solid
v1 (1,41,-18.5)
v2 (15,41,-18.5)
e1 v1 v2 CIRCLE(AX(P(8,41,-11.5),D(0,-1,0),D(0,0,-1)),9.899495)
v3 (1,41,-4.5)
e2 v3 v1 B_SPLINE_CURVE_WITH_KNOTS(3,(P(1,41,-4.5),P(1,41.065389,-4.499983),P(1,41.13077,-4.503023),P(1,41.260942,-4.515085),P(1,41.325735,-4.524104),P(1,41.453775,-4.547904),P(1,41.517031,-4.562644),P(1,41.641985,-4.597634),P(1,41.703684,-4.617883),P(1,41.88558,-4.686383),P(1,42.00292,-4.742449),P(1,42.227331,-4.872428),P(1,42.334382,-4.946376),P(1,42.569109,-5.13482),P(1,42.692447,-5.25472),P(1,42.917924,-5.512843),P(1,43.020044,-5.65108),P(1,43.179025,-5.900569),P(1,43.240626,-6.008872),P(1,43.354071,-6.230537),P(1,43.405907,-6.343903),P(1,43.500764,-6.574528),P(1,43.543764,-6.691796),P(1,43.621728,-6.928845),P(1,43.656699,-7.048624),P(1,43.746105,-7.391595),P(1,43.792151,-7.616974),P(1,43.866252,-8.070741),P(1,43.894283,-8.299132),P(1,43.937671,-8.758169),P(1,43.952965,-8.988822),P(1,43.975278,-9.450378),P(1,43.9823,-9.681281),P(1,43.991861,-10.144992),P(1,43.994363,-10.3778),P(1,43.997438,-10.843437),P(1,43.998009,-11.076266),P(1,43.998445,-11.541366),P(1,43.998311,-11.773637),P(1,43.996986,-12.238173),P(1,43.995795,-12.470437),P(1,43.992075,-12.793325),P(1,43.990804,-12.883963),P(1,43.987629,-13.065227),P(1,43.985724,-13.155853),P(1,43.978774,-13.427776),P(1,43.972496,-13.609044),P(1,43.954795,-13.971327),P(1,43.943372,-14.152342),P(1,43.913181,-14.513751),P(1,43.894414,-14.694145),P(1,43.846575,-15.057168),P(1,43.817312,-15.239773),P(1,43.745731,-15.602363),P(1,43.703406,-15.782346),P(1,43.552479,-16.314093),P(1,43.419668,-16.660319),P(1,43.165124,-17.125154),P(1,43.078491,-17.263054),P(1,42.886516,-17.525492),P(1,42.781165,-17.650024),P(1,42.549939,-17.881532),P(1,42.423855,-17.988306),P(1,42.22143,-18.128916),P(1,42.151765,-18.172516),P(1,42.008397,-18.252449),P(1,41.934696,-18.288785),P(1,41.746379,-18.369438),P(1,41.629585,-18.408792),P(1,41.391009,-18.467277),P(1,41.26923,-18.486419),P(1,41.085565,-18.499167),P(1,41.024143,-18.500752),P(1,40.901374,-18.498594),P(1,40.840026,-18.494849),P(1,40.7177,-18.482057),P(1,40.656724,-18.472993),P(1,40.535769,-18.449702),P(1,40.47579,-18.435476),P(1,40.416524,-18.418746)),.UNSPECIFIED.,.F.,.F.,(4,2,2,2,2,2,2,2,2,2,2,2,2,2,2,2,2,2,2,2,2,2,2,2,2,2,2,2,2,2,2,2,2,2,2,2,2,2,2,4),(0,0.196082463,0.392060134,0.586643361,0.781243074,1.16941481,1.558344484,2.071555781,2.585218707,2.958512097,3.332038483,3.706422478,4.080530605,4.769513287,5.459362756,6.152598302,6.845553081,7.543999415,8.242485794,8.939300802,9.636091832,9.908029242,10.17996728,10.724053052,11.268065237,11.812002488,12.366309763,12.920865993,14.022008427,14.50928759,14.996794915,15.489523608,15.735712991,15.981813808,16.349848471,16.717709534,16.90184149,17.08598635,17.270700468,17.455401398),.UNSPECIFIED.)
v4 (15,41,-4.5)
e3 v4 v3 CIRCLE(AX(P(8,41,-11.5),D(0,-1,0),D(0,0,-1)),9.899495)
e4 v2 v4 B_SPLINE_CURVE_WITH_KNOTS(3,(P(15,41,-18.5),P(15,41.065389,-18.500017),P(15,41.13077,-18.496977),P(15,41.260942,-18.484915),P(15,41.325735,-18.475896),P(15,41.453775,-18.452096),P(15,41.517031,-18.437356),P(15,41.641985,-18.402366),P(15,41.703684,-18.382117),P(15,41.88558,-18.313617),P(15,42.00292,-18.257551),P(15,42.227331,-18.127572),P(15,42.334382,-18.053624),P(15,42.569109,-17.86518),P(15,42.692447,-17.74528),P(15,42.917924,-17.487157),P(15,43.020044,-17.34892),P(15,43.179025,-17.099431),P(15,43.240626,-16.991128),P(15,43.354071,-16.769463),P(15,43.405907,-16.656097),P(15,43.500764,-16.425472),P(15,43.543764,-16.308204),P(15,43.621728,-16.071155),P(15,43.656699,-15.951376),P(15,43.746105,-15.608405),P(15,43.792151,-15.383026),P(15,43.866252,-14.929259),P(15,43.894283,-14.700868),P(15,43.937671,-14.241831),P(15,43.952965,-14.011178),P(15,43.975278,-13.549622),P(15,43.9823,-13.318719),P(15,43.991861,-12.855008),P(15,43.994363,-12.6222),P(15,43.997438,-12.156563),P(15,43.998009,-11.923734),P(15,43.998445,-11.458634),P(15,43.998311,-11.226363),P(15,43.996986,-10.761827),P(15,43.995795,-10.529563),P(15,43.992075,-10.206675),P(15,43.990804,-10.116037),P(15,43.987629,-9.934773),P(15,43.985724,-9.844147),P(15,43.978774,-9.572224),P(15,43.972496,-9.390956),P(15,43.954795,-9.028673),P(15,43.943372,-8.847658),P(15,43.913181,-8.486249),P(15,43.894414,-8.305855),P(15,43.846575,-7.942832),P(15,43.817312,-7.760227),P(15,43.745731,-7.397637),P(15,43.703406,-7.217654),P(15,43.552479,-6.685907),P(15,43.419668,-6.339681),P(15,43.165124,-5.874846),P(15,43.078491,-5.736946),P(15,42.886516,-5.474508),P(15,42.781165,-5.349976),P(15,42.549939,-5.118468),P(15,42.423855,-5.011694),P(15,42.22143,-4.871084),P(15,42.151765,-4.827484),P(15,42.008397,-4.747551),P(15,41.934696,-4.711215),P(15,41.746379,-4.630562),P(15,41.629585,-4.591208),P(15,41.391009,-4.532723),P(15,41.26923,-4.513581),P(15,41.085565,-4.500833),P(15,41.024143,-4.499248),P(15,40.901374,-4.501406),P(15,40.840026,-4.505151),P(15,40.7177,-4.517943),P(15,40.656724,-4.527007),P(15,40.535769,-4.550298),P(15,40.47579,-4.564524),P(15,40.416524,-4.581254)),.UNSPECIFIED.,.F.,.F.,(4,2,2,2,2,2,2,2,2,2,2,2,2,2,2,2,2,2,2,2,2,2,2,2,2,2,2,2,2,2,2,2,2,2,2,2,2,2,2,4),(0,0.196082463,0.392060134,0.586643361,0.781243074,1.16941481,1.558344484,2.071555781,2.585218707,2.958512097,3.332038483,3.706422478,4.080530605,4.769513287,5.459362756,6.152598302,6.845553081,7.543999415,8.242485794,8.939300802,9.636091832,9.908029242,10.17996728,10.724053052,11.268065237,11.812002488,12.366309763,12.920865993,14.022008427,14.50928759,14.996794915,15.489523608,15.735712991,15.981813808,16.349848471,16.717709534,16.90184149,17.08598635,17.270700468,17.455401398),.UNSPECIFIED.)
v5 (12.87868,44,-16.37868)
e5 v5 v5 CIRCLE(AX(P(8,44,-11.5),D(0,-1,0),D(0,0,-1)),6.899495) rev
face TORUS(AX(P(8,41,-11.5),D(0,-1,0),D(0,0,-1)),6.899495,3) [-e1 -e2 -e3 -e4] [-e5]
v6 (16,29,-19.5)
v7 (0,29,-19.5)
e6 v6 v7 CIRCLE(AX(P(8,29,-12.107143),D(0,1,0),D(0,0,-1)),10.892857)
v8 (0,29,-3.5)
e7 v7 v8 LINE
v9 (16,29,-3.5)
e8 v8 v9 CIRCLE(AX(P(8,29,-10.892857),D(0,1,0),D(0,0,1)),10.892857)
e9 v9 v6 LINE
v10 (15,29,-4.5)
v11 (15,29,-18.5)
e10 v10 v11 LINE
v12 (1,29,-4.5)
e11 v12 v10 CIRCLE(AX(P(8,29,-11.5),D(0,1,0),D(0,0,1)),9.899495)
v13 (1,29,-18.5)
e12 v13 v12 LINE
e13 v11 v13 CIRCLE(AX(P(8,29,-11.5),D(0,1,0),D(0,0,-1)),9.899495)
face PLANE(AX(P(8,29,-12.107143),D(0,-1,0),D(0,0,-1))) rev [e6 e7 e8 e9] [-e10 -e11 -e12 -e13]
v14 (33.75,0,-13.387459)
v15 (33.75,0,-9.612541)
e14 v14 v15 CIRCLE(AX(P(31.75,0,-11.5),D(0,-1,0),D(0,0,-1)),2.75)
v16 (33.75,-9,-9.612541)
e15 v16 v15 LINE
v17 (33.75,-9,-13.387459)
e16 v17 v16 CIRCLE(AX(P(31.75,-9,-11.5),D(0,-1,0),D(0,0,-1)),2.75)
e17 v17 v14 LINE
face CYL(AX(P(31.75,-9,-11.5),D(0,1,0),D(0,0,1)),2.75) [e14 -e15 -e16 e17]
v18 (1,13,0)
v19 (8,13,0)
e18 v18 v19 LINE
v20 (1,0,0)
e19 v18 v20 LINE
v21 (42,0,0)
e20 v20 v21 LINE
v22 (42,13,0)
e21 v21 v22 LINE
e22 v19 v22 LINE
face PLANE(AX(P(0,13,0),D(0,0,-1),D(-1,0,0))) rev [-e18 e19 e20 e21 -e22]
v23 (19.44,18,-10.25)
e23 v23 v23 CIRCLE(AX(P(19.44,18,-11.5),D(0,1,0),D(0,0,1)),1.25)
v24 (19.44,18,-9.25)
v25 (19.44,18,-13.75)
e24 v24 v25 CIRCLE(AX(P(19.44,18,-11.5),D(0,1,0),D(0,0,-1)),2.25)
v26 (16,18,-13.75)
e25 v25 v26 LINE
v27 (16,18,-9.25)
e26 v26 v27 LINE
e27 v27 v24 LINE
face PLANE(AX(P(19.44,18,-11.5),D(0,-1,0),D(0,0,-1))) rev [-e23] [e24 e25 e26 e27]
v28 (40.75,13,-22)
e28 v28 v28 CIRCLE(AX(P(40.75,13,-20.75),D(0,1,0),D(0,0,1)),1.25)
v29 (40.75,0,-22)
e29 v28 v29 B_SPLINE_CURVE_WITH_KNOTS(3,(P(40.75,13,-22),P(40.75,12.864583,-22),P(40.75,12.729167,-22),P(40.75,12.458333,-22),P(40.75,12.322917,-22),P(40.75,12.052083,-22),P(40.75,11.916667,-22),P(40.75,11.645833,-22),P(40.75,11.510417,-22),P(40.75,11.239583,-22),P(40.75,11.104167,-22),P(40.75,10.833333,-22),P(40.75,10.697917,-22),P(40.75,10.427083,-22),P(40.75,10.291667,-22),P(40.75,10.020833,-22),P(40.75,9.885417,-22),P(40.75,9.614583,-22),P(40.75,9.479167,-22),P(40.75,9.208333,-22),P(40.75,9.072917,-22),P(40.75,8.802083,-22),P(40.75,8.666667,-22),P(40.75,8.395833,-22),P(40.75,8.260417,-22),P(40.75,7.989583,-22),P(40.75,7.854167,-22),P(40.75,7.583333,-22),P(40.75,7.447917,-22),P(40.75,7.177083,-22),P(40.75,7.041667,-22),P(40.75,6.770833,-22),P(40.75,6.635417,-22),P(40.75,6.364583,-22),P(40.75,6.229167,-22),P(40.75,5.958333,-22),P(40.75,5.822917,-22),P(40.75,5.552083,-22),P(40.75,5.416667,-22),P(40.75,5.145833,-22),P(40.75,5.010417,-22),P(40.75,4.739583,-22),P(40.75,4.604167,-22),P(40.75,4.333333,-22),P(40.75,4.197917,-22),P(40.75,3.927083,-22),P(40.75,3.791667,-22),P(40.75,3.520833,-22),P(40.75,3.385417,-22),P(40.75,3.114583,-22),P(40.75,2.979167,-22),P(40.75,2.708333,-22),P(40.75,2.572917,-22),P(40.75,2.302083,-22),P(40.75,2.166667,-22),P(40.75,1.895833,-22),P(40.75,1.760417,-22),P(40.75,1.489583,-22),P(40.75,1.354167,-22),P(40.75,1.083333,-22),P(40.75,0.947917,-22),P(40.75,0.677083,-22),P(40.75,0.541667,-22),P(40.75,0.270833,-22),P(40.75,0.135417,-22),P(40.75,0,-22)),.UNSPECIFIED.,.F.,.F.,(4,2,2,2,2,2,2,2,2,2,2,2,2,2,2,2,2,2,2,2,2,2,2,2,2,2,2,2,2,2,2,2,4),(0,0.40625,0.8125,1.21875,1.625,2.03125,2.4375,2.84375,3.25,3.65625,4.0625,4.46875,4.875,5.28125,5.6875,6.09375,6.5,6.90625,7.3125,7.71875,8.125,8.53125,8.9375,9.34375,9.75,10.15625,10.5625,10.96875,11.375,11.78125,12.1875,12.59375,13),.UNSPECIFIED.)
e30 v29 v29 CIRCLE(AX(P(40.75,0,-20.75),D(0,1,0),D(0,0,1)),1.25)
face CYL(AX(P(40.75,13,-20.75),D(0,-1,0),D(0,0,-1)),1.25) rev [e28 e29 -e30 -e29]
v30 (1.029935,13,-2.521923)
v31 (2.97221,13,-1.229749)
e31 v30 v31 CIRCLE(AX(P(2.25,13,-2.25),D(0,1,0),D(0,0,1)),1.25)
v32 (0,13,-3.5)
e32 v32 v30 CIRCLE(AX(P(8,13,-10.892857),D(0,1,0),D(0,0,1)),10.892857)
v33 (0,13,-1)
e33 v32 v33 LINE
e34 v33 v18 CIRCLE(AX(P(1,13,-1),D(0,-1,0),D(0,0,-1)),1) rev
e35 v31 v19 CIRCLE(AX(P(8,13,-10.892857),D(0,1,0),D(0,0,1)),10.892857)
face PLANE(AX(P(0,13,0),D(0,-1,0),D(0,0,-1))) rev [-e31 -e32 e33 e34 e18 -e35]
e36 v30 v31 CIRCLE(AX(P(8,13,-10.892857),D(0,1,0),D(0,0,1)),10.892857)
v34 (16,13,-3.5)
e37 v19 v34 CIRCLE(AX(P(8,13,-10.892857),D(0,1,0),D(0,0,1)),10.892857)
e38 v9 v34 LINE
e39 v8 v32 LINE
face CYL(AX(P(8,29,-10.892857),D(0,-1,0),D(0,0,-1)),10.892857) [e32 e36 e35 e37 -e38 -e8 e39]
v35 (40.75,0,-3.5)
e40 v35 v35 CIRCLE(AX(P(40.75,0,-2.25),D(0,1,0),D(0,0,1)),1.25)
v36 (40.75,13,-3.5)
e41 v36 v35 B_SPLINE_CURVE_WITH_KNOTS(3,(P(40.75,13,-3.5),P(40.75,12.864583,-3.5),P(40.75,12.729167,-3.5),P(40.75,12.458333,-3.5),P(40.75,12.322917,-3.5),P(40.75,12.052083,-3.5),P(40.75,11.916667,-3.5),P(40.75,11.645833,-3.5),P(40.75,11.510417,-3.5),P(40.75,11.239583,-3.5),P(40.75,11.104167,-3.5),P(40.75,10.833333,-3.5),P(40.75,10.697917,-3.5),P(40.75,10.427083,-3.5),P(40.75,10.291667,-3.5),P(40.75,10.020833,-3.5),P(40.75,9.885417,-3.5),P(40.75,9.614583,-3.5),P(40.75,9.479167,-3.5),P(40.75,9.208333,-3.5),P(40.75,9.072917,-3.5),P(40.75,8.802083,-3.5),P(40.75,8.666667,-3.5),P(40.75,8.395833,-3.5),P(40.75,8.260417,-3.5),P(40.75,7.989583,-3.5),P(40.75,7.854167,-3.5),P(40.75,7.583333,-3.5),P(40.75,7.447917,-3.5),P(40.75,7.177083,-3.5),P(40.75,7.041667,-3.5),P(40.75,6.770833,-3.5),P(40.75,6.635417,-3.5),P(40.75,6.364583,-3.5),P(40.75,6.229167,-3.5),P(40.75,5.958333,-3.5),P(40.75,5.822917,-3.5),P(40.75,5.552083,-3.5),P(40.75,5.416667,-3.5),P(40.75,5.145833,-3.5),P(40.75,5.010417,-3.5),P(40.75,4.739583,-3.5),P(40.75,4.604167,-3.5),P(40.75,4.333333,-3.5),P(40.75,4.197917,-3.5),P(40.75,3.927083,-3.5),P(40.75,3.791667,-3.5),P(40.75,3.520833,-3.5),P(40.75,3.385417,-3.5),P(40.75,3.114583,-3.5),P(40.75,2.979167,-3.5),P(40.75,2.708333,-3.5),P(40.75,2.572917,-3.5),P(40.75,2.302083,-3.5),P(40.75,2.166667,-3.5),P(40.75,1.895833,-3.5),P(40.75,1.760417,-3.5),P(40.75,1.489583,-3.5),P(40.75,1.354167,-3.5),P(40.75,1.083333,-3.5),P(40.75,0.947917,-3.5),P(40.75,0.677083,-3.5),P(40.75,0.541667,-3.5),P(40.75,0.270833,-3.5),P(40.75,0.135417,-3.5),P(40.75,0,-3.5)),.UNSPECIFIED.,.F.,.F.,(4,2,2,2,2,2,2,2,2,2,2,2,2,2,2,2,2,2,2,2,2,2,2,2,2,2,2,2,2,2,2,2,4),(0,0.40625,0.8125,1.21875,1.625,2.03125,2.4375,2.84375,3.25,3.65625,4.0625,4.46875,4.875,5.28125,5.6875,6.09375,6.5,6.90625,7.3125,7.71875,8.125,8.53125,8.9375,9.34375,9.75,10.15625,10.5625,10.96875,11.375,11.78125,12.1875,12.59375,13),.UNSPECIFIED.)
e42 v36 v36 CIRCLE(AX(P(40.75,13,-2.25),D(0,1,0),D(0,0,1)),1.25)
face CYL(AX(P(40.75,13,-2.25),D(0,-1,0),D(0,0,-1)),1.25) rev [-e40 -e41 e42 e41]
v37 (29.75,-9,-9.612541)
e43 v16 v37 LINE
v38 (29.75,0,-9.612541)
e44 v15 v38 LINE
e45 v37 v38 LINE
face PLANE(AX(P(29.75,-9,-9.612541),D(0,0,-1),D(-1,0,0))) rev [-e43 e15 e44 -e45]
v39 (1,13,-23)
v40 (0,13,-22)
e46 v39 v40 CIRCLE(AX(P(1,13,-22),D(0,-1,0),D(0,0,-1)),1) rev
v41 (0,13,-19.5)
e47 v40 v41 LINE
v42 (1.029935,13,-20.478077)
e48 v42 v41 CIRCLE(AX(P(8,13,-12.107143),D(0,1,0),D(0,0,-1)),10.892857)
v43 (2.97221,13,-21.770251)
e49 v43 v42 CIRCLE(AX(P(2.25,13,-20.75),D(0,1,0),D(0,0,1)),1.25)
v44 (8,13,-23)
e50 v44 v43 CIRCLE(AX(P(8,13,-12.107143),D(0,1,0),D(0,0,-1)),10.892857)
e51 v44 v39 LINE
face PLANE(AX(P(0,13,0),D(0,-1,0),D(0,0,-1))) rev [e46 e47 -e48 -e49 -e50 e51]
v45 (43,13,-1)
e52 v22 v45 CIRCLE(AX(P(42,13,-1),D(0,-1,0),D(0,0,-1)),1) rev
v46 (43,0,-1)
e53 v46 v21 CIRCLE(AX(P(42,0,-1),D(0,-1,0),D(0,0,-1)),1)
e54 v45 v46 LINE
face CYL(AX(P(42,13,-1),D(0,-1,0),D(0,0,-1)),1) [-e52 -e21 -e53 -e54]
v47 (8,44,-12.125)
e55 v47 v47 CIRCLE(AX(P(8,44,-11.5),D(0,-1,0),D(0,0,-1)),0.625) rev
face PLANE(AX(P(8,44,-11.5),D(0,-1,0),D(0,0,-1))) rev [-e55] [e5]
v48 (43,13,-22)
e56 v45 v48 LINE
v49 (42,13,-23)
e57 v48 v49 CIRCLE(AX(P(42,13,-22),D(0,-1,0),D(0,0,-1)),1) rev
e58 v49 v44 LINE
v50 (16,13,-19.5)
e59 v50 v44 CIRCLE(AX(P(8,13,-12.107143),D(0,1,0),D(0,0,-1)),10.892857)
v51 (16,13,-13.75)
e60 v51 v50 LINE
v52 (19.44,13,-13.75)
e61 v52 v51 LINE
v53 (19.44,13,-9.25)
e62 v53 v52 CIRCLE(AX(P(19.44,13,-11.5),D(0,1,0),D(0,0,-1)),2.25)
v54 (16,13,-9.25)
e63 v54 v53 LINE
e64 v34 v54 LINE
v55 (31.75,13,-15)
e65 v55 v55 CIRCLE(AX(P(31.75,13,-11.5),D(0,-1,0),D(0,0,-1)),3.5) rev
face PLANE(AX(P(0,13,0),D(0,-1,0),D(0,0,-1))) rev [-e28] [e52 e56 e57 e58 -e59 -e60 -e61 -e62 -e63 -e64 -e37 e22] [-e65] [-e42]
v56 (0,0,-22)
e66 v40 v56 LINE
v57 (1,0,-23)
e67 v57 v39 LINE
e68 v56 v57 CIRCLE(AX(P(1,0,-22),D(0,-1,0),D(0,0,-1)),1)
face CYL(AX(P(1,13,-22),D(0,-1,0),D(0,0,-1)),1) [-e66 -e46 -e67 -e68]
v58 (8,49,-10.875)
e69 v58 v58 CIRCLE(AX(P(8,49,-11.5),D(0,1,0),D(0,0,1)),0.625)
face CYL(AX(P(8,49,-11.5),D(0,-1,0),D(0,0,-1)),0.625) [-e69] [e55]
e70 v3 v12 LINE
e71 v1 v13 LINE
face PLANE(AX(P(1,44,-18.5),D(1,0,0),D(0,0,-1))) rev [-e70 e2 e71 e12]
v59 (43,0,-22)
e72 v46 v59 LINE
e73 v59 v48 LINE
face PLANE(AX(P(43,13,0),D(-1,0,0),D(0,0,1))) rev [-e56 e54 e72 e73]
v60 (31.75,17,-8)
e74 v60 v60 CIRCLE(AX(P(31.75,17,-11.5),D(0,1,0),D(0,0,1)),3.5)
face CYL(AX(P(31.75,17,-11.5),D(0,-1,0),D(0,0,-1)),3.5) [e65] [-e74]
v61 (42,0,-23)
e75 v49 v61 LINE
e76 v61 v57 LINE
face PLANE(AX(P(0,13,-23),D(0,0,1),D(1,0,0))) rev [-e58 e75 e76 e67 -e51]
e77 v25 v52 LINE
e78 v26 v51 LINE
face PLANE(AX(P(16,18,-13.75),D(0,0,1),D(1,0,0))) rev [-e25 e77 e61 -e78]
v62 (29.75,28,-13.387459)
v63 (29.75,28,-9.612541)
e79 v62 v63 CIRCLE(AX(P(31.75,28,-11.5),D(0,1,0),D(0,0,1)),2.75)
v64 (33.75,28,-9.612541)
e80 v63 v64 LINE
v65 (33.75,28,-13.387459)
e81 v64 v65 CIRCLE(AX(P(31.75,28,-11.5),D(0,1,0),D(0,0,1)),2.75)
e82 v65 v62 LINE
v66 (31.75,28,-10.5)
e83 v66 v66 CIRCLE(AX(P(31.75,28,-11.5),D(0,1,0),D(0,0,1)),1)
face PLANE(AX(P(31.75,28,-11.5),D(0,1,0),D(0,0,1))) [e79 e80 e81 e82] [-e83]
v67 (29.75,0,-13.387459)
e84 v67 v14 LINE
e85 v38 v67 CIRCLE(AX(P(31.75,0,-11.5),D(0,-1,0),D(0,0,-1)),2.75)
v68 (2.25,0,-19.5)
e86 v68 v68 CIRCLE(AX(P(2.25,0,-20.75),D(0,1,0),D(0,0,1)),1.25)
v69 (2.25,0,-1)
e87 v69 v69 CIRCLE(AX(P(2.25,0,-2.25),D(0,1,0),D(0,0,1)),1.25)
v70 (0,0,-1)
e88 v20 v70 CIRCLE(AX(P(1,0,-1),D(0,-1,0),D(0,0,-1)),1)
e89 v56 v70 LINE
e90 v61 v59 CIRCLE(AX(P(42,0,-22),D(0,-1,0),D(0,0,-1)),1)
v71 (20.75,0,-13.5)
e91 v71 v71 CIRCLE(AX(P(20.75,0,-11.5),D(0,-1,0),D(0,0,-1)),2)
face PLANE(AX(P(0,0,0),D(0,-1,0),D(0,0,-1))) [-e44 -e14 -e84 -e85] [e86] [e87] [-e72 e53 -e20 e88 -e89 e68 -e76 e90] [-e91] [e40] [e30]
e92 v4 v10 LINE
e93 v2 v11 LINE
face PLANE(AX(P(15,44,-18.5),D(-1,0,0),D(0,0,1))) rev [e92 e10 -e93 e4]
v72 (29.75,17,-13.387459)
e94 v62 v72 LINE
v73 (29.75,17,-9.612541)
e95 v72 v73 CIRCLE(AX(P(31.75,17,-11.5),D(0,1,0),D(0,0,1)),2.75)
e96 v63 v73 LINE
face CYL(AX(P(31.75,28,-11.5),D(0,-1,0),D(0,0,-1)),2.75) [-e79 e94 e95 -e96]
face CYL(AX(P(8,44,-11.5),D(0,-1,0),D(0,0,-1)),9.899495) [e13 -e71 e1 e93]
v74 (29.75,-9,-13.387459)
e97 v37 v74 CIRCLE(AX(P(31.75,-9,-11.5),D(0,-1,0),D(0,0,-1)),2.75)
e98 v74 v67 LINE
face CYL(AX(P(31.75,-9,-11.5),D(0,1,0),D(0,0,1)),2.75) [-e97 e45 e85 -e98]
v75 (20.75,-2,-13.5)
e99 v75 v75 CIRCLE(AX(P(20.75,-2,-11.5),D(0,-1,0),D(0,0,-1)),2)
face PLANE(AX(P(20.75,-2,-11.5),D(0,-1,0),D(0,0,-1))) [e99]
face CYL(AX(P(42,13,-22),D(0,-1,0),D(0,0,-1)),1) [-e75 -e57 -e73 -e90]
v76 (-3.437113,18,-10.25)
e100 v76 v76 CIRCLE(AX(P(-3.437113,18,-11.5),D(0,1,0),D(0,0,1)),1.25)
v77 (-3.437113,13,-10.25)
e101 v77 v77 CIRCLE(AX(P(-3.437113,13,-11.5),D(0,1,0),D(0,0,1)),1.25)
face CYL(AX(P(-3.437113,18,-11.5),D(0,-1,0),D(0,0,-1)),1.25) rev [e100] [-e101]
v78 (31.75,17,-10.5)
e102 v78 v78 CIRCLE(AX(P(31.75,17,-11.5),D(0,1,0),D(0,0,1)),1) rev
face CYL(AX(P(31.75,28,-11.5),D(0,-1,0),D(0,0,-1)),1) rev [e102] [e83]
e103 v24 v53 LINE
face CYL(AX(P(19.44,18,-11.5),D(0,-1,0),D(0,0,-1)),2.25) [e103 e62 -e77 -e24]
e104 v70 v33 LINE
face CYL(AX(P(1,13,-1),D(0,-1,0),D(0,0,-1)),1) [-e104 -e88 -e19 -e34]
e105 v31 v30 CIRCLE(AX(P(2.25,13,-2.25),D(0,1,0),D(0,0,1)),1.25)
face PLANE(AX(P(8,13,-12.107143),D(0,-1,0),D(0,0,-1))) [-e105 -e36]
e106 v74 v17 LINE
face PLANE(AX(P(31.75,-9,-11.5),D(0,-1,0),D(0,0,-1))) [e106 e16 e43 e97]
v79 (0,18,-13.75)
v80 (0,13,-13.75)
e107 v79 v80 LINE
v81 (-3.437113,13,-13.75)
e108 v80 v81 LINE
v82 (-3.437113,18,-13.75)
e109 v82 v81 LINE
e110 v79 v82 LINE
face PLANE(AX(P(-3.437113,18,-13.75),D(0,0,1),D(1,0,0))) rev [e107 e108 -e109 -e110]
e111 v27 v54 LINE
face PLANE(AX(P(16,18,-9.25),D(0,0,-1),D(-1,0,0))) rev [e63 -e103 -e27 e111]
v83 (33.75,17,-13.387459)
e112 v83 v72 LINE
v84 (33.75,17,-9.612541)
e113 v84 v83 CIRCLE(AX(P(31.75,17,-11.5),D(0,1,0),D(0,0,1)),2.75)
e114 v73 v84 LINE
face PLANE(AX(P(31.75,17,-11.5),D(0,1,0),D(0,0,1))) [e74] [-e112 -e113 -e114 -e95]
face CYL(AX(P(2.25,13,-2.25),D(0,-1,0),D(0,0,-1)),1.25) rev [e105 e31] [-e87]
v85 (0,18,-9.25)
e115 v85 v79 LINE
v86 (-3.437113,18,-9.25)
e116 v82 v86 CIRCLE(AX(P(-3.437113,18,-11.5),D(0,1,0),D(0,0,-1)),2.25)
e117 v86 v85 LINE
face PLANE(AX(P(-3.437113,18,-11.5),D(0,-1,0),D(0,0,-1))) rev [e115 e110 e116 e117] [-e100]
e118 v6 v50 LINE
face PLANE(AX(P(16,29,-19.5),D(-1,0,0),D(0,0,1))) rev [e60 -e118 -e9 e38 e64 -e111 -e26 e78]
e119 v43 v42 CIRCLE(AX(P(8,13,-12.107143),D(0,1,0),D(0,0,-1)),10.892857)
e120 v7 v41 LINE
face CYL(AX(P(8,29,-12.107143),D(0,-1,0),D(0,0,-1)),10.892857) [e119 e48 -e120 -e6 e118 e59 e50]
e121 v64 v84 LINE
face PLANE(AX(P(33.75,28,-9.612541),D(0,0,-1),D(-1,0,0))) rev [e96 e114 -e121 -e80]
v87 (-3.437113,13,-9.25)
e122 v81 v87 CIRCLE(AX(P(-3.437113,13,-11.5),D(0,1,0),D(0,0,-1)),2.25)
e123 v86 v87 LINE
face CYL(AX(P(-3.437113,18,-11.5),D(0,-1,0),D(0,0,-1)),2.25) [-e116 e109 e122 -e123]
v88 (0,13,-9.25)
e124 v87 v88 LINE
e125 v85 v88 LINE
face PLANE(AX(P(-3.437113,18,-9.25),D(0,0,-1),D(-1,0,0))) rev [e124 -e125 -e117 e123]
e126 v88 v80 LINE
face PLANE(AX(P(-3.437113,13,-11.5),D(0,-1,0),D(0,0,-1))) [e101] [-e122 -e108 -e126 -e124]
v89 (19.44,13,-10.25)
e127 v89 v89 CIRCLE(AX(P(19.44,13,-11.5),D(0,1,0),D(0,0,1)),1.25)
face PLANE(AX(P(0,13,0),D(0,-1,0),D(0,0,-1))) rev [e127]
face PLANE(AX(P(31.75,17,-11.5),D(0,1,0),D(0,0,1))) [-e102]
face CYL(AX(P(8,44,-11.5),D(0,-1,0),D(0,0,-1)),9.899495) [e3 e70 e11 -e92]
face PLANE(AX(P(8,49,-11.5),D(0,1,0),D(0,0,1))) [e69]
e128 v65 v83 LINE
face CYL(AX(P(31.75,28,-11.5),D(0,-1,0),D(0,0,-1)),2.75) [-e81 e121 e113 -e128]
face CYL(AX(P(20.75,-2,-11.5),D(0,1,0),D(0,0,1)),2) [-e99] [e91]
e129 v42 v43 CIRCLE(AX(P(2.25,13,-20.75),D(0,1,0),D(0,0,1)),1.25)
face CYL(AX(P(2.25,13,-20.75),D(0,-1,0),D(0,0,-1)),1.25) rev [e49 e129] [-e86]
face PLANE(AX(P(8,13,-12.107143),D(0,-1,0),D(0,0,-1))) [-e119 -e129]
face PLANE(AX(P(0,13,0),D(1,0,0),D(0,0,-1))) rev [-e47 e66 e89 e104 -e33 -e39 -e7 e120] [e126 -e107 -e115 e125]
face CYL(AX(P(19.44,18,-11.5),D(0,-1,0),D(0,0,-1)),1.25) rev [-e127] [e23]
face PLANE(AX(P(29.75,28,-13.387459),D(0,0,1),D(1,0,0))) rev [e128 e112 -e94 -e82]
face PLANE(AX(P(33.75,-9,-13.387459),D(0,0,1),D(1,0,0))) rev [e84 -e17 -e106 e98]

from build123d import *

# Parameters (mm, degrees)
SKETCH2_W            = 43
SKETCH2_H            = 23
SKETCH2_R            = 1.25
BOSS_EXTRUDE1_DEPTH  = 13
FILLET1_R            = 1
BOSS_EXTRUDE2_DEPTH  = 16
BOSS_EXTRUDE3_DEPTH  = 15
SKETCH5_R            = 0.625
BOSS_EXTRUDE4_DEPTH  = 5
FILLET2_R            = 3
SKETCH6_R            = 3.5
BOSS_EXTRUDE5_DEPTH  = 4
SKETCH7_R            = 1
BOSS_EXTRUDE7_DEPTH  = 11
SKETCH8_R            = 1.25
BOSS_EXTRUDE8_DEPTH  = 5
BOSS_EXTRUDE9_START  = 9
BOSS_EXTRUDE9_DEPTH  = 9
SKETCH10_R           = 2
BOSS_EXTRUDE10_DEPTH = 2


with BuildPart() as part:
    # Sketch2 → Boss-Extrude1 (new body)
    with BuildSketch(Plane(origin=(0, 0, 0), x_dir=(1, 0, 0), z_dir=(0, 1, 0))):
        with Locations((21.5, 11.5)):
            Rectangle(SKETCH2_W, SKETCH2_H)
        with Locations(Location((2.25, 20.75, 0), (0, 0, 90))):
            Circle(SKETCH2_R, mode=Mode.SUBTRACT)
        with Locations(Location((40.75, 20.75, 0), (0, 0, 90))):
            Circle(SKETCH2_R, mode=Mode.SUBTRACT)
        with Locations(Location((40.75, 2.25, 0), (0, 0, 90))):
            Circle(SKETCH2_R, mode=Mode.SUBTRACT)
        with Locations(Location((2.25, 2.25, 0), (0, 0, 90))):
            Circle(SKETCH2_R, mode=Mode.SUBTRACT)
    extrude(amount=BOSS_EXTRUDE1_DEPTH)

    # Fillet1
    fillet1_edges = [part.edges().sort_by_distance(p)[0] for p in [
        (0, 6.5, -23),
        (43, 6.5, -23),
        (43, 6.5, 0),
        (0, 6.5, 0),
    ]]
    fillet(fillet1_edges, radius=FILLET1_R)

    # Sketch3 → Boss-Extrude2 (add)
    with BuildSketch(Plane(origin=(0, 13, 0), x_dir=(1, 0, 0), z_dir=(0, 1, 0))):
        with BuildLine():
            Line((16, 19.5), (16, 3.5))
            ThreePointArc((16, 3.5), (8, 0), (0, 3.5))
            Line((0, 3.5), (0, 19.5))
            ThreePointArc((0, 19.5), (8, 23), (16, 19.5))
        make_face()
    extrude(amount=BOSS_EXTRUDE2_DEPTH)

    # Sketch4 → Boss-Extrude3 (add)
    with BuildSketch(Plane(origin=(0, 29, 0), x_dir=(1, 0, 0), z_dir=(0, 1, 0))):
        with BuildLine():
            Line((1, 18.5), (1, 4.5))
            ThreePointArc((1, 4.5), (8, 1.600505063), (15, 4.5))
            Line((15, 4.5), (15, 18.5))
            ThreePointArc((15, 18.5), (8, 21.399494937), (1, 18.5))
        make_face()
    extrude(amount=BOSS_EXTRUDE3_DEPTH)

    # Sketch5 → Boss-Extrude4 (add)
    with BuildSketch(Plane(origin=(0, 44, 0), x_dir=(1, 0, 0), z_dir=(0, 1, 0))):
        with Locations(Location((8, 11.5, 0), (0, 0, 90))):
            Circle(SKETCH5_R)
    extrude(amount=BOSS_EXTRUDE4_DEPTH)

    # Fillet2
    # the kernel refuses this fillet: 3 mm, written as the material it takes off along each edge
    with BuildSketch(Plane(origin=(8, 44, -11.5), x_dir=(0.5117233691003439, 0, 0.8591502741177431), z_dir=(-0.8591502741177431, 0, 0.5117233691003439))) as fillet2_piece_1:
        with BuildLine():
            CenterArc((9.899494937 - FILLET2_R, -FILLET2_R), FILLET2_R, 0, 90)
            Line((9.899494937 - FILLET2_R, 0), (9.899494937 - FILLET2_R, FILLET2_R * 0.02))
            Line((9.899494937 - FILLET2_R, FILLET2_R * 0.02), (9.899494937 + FILLET2_R * 0.02, FILLET2_R * 0.02))
            Line((9.899494937 + FILLET2_R * 0.02, FILLET2_R * 0.02), (9.899494937 + FILLET2_R * 0.02, -FILLET2_R))
            Line((9.899494937 + FILLET2_R * 0.02, -FILLET2_R), (9.899494937, -FILLET2_R))
        make_face()
    revolve(axis=Axis((8, 44, -11.5), (0, 1, 0)), revolution_arc=298.442618359, mode=Mode.SUBTRACT)
    with BuildSketch(Plane(origin=(8, 44, -11.5), x_dir=(-0.5117233691003458, 0, -0.859150274117742), z_dir=(0.859150274117742, 0, -0.5117233691003458))) as fillet2_piece_2:
        with BuildLine():
            CenterArc((9.899494937 - FILLET2_R, -FILLET2_R), FILLET2_R, 0, 90)
            Line((9.899494937 - FILLET2_R, 0), (9.899494937 - FILLET2_R, FILLET2_R * 0.02))
            Line((9.899494937 - FILLET2_R, FILLET2_R * 0.02), (9.899494937 + FILLET2_R * 0.02, FILLET2_R * 0.02))
            Line((9.899494937 + FILLET2_R * 0.02, FILLET2_R * 0.02), (9.899494937 + FILLET2_R * 0.02, -FILLET2_R))
            Line((9.899494937 + FILLET2_R * 0.02, -FILLET2_R), (9.899494937, -FILLET2_R))
        make_face()
    revolve(axis=Axis((8, 44, -11.5), (0, 1, 0)), revolution_arc=298.442618359, mode=Mode.SUBTRACT)

    # Sketch6 → Boss-Extrude5 (add)
    with BuildSketch(Plane(origin=(0, 13, 0), x_dir=(1, 0, 0), z_dir=(0, 1, 0))):
        with Locations(Location((31.75, 11.5, 0), (0, 0, 90))):
            Circle(SKETCH6_R)
    extrude(amount=BOSS_EXTRUDE5_DEPTH)

    # Sketch7 → Boss-Extrude7 (add)
    with BuildSketch(Plane(origin=(0, 17, 0), x_dir=(1, 0, 0), z_dir=(0, 1, 0))):
        with BuildLine():
            Line((29.75, 13.387458609), (33.75, 13.387458609))
            ThreePointArc((33.75, 13.387458609), (34.5, 11.5), (33.75, 9.612541391))
            Line((33.75, 9.612541391), (29.75, 9.612541391))
            ThreePointArc((29.75, 9.612541391), (29, 11.5), (29.75, 13.387458609))
        make_face()
        with Locations(Location((31.75, 11.5, 0), (0, 0, 270))):
            Circle(SKETCH7_R, mode=Mode.SUBTRACT)
    extrude(amount=BOSS_EXTRUDE7_DEPTH)

    # Sketch8 → Boss-Extrude8 (add)
    # profile 1 of 2: a face of its own
    with BuildSketch(Plane(origin=(0, 13, 0), x_dir=(1, 0, 0), z_dir=(0, 1, 0))):
        with BuildLine():
            Line((-3.437113108, 13.75), (0, 13.75))
            Line((0, 13.75), (0, 9.25))
            Line((0, 9.25), (-3.437113108, 9.25))
            ThreePointArc((-3.437113108, 9.25), (-5.687113108, 11.5), (-3.437113108, 13.75))
        make_face()
        with Locations(Location((-3.437113108, 11.5, 0), (0, 0, 270))):
            Circle(SKETCH8_R, mode=Mode.SUBTRACT)
    # profile 2 of 2: a face of its own
    with BuildSketch(Plane(origin=(0, 13, 0), x_dir=(1, 0, 0), z_dir=(0, 1, 0))):
        with BuildLine():
            Line((16, 9.25), (19.44, 9.25))
            ThreePointArc((19.44, 9.25), (21.69, 11.5), (19.44, 13.75))
            Line((19.44, 13.75), (16, 13.75))
            Line((16, 13.75), (16, 9.25))
        make_face()
        with Locations(Location((19.44, 11.5, 0), (0, 0, 270))):
            Circle(SKETCH8_R, mode=Mode.SUBTRACT)
    extrude(amount=BOSS_EXTRUDE8_DEPTH)

    # Sketch9 → Boss-Extrude9 (add)
    with BuildSketch(Plane.XZ.offset(BOSS_EXTRUDE9_START)):
        with BuildLine():
            Line((33.75, -13.387458609), (29.75, -13.387458609))
            ThreePointArc((29.75, -13.387458609), (29, -11.5), (29.75, -9.612541391))
            Line((29.75, -9.612541391), (33.75, -9.612541391))
            ThreePointArc((33.75, -9.612541391), (34.5, -11.5), (33.75, -13.387458609))
        make_face()
    extrude(amount=-BOSS_EXTRUDE9_DEPTH)

    # Sketch10 → Boss-Extrude10 (add)
    with BuildSketch(Plane.XZ):
        with Locations(Location((20.75, -11.5, 0), (0, 0, 270))):
            Circle(SKETCH10_R)
    extrude(amount=BOSS_EXTRUDE10_DEPTH)


solid = part.part
